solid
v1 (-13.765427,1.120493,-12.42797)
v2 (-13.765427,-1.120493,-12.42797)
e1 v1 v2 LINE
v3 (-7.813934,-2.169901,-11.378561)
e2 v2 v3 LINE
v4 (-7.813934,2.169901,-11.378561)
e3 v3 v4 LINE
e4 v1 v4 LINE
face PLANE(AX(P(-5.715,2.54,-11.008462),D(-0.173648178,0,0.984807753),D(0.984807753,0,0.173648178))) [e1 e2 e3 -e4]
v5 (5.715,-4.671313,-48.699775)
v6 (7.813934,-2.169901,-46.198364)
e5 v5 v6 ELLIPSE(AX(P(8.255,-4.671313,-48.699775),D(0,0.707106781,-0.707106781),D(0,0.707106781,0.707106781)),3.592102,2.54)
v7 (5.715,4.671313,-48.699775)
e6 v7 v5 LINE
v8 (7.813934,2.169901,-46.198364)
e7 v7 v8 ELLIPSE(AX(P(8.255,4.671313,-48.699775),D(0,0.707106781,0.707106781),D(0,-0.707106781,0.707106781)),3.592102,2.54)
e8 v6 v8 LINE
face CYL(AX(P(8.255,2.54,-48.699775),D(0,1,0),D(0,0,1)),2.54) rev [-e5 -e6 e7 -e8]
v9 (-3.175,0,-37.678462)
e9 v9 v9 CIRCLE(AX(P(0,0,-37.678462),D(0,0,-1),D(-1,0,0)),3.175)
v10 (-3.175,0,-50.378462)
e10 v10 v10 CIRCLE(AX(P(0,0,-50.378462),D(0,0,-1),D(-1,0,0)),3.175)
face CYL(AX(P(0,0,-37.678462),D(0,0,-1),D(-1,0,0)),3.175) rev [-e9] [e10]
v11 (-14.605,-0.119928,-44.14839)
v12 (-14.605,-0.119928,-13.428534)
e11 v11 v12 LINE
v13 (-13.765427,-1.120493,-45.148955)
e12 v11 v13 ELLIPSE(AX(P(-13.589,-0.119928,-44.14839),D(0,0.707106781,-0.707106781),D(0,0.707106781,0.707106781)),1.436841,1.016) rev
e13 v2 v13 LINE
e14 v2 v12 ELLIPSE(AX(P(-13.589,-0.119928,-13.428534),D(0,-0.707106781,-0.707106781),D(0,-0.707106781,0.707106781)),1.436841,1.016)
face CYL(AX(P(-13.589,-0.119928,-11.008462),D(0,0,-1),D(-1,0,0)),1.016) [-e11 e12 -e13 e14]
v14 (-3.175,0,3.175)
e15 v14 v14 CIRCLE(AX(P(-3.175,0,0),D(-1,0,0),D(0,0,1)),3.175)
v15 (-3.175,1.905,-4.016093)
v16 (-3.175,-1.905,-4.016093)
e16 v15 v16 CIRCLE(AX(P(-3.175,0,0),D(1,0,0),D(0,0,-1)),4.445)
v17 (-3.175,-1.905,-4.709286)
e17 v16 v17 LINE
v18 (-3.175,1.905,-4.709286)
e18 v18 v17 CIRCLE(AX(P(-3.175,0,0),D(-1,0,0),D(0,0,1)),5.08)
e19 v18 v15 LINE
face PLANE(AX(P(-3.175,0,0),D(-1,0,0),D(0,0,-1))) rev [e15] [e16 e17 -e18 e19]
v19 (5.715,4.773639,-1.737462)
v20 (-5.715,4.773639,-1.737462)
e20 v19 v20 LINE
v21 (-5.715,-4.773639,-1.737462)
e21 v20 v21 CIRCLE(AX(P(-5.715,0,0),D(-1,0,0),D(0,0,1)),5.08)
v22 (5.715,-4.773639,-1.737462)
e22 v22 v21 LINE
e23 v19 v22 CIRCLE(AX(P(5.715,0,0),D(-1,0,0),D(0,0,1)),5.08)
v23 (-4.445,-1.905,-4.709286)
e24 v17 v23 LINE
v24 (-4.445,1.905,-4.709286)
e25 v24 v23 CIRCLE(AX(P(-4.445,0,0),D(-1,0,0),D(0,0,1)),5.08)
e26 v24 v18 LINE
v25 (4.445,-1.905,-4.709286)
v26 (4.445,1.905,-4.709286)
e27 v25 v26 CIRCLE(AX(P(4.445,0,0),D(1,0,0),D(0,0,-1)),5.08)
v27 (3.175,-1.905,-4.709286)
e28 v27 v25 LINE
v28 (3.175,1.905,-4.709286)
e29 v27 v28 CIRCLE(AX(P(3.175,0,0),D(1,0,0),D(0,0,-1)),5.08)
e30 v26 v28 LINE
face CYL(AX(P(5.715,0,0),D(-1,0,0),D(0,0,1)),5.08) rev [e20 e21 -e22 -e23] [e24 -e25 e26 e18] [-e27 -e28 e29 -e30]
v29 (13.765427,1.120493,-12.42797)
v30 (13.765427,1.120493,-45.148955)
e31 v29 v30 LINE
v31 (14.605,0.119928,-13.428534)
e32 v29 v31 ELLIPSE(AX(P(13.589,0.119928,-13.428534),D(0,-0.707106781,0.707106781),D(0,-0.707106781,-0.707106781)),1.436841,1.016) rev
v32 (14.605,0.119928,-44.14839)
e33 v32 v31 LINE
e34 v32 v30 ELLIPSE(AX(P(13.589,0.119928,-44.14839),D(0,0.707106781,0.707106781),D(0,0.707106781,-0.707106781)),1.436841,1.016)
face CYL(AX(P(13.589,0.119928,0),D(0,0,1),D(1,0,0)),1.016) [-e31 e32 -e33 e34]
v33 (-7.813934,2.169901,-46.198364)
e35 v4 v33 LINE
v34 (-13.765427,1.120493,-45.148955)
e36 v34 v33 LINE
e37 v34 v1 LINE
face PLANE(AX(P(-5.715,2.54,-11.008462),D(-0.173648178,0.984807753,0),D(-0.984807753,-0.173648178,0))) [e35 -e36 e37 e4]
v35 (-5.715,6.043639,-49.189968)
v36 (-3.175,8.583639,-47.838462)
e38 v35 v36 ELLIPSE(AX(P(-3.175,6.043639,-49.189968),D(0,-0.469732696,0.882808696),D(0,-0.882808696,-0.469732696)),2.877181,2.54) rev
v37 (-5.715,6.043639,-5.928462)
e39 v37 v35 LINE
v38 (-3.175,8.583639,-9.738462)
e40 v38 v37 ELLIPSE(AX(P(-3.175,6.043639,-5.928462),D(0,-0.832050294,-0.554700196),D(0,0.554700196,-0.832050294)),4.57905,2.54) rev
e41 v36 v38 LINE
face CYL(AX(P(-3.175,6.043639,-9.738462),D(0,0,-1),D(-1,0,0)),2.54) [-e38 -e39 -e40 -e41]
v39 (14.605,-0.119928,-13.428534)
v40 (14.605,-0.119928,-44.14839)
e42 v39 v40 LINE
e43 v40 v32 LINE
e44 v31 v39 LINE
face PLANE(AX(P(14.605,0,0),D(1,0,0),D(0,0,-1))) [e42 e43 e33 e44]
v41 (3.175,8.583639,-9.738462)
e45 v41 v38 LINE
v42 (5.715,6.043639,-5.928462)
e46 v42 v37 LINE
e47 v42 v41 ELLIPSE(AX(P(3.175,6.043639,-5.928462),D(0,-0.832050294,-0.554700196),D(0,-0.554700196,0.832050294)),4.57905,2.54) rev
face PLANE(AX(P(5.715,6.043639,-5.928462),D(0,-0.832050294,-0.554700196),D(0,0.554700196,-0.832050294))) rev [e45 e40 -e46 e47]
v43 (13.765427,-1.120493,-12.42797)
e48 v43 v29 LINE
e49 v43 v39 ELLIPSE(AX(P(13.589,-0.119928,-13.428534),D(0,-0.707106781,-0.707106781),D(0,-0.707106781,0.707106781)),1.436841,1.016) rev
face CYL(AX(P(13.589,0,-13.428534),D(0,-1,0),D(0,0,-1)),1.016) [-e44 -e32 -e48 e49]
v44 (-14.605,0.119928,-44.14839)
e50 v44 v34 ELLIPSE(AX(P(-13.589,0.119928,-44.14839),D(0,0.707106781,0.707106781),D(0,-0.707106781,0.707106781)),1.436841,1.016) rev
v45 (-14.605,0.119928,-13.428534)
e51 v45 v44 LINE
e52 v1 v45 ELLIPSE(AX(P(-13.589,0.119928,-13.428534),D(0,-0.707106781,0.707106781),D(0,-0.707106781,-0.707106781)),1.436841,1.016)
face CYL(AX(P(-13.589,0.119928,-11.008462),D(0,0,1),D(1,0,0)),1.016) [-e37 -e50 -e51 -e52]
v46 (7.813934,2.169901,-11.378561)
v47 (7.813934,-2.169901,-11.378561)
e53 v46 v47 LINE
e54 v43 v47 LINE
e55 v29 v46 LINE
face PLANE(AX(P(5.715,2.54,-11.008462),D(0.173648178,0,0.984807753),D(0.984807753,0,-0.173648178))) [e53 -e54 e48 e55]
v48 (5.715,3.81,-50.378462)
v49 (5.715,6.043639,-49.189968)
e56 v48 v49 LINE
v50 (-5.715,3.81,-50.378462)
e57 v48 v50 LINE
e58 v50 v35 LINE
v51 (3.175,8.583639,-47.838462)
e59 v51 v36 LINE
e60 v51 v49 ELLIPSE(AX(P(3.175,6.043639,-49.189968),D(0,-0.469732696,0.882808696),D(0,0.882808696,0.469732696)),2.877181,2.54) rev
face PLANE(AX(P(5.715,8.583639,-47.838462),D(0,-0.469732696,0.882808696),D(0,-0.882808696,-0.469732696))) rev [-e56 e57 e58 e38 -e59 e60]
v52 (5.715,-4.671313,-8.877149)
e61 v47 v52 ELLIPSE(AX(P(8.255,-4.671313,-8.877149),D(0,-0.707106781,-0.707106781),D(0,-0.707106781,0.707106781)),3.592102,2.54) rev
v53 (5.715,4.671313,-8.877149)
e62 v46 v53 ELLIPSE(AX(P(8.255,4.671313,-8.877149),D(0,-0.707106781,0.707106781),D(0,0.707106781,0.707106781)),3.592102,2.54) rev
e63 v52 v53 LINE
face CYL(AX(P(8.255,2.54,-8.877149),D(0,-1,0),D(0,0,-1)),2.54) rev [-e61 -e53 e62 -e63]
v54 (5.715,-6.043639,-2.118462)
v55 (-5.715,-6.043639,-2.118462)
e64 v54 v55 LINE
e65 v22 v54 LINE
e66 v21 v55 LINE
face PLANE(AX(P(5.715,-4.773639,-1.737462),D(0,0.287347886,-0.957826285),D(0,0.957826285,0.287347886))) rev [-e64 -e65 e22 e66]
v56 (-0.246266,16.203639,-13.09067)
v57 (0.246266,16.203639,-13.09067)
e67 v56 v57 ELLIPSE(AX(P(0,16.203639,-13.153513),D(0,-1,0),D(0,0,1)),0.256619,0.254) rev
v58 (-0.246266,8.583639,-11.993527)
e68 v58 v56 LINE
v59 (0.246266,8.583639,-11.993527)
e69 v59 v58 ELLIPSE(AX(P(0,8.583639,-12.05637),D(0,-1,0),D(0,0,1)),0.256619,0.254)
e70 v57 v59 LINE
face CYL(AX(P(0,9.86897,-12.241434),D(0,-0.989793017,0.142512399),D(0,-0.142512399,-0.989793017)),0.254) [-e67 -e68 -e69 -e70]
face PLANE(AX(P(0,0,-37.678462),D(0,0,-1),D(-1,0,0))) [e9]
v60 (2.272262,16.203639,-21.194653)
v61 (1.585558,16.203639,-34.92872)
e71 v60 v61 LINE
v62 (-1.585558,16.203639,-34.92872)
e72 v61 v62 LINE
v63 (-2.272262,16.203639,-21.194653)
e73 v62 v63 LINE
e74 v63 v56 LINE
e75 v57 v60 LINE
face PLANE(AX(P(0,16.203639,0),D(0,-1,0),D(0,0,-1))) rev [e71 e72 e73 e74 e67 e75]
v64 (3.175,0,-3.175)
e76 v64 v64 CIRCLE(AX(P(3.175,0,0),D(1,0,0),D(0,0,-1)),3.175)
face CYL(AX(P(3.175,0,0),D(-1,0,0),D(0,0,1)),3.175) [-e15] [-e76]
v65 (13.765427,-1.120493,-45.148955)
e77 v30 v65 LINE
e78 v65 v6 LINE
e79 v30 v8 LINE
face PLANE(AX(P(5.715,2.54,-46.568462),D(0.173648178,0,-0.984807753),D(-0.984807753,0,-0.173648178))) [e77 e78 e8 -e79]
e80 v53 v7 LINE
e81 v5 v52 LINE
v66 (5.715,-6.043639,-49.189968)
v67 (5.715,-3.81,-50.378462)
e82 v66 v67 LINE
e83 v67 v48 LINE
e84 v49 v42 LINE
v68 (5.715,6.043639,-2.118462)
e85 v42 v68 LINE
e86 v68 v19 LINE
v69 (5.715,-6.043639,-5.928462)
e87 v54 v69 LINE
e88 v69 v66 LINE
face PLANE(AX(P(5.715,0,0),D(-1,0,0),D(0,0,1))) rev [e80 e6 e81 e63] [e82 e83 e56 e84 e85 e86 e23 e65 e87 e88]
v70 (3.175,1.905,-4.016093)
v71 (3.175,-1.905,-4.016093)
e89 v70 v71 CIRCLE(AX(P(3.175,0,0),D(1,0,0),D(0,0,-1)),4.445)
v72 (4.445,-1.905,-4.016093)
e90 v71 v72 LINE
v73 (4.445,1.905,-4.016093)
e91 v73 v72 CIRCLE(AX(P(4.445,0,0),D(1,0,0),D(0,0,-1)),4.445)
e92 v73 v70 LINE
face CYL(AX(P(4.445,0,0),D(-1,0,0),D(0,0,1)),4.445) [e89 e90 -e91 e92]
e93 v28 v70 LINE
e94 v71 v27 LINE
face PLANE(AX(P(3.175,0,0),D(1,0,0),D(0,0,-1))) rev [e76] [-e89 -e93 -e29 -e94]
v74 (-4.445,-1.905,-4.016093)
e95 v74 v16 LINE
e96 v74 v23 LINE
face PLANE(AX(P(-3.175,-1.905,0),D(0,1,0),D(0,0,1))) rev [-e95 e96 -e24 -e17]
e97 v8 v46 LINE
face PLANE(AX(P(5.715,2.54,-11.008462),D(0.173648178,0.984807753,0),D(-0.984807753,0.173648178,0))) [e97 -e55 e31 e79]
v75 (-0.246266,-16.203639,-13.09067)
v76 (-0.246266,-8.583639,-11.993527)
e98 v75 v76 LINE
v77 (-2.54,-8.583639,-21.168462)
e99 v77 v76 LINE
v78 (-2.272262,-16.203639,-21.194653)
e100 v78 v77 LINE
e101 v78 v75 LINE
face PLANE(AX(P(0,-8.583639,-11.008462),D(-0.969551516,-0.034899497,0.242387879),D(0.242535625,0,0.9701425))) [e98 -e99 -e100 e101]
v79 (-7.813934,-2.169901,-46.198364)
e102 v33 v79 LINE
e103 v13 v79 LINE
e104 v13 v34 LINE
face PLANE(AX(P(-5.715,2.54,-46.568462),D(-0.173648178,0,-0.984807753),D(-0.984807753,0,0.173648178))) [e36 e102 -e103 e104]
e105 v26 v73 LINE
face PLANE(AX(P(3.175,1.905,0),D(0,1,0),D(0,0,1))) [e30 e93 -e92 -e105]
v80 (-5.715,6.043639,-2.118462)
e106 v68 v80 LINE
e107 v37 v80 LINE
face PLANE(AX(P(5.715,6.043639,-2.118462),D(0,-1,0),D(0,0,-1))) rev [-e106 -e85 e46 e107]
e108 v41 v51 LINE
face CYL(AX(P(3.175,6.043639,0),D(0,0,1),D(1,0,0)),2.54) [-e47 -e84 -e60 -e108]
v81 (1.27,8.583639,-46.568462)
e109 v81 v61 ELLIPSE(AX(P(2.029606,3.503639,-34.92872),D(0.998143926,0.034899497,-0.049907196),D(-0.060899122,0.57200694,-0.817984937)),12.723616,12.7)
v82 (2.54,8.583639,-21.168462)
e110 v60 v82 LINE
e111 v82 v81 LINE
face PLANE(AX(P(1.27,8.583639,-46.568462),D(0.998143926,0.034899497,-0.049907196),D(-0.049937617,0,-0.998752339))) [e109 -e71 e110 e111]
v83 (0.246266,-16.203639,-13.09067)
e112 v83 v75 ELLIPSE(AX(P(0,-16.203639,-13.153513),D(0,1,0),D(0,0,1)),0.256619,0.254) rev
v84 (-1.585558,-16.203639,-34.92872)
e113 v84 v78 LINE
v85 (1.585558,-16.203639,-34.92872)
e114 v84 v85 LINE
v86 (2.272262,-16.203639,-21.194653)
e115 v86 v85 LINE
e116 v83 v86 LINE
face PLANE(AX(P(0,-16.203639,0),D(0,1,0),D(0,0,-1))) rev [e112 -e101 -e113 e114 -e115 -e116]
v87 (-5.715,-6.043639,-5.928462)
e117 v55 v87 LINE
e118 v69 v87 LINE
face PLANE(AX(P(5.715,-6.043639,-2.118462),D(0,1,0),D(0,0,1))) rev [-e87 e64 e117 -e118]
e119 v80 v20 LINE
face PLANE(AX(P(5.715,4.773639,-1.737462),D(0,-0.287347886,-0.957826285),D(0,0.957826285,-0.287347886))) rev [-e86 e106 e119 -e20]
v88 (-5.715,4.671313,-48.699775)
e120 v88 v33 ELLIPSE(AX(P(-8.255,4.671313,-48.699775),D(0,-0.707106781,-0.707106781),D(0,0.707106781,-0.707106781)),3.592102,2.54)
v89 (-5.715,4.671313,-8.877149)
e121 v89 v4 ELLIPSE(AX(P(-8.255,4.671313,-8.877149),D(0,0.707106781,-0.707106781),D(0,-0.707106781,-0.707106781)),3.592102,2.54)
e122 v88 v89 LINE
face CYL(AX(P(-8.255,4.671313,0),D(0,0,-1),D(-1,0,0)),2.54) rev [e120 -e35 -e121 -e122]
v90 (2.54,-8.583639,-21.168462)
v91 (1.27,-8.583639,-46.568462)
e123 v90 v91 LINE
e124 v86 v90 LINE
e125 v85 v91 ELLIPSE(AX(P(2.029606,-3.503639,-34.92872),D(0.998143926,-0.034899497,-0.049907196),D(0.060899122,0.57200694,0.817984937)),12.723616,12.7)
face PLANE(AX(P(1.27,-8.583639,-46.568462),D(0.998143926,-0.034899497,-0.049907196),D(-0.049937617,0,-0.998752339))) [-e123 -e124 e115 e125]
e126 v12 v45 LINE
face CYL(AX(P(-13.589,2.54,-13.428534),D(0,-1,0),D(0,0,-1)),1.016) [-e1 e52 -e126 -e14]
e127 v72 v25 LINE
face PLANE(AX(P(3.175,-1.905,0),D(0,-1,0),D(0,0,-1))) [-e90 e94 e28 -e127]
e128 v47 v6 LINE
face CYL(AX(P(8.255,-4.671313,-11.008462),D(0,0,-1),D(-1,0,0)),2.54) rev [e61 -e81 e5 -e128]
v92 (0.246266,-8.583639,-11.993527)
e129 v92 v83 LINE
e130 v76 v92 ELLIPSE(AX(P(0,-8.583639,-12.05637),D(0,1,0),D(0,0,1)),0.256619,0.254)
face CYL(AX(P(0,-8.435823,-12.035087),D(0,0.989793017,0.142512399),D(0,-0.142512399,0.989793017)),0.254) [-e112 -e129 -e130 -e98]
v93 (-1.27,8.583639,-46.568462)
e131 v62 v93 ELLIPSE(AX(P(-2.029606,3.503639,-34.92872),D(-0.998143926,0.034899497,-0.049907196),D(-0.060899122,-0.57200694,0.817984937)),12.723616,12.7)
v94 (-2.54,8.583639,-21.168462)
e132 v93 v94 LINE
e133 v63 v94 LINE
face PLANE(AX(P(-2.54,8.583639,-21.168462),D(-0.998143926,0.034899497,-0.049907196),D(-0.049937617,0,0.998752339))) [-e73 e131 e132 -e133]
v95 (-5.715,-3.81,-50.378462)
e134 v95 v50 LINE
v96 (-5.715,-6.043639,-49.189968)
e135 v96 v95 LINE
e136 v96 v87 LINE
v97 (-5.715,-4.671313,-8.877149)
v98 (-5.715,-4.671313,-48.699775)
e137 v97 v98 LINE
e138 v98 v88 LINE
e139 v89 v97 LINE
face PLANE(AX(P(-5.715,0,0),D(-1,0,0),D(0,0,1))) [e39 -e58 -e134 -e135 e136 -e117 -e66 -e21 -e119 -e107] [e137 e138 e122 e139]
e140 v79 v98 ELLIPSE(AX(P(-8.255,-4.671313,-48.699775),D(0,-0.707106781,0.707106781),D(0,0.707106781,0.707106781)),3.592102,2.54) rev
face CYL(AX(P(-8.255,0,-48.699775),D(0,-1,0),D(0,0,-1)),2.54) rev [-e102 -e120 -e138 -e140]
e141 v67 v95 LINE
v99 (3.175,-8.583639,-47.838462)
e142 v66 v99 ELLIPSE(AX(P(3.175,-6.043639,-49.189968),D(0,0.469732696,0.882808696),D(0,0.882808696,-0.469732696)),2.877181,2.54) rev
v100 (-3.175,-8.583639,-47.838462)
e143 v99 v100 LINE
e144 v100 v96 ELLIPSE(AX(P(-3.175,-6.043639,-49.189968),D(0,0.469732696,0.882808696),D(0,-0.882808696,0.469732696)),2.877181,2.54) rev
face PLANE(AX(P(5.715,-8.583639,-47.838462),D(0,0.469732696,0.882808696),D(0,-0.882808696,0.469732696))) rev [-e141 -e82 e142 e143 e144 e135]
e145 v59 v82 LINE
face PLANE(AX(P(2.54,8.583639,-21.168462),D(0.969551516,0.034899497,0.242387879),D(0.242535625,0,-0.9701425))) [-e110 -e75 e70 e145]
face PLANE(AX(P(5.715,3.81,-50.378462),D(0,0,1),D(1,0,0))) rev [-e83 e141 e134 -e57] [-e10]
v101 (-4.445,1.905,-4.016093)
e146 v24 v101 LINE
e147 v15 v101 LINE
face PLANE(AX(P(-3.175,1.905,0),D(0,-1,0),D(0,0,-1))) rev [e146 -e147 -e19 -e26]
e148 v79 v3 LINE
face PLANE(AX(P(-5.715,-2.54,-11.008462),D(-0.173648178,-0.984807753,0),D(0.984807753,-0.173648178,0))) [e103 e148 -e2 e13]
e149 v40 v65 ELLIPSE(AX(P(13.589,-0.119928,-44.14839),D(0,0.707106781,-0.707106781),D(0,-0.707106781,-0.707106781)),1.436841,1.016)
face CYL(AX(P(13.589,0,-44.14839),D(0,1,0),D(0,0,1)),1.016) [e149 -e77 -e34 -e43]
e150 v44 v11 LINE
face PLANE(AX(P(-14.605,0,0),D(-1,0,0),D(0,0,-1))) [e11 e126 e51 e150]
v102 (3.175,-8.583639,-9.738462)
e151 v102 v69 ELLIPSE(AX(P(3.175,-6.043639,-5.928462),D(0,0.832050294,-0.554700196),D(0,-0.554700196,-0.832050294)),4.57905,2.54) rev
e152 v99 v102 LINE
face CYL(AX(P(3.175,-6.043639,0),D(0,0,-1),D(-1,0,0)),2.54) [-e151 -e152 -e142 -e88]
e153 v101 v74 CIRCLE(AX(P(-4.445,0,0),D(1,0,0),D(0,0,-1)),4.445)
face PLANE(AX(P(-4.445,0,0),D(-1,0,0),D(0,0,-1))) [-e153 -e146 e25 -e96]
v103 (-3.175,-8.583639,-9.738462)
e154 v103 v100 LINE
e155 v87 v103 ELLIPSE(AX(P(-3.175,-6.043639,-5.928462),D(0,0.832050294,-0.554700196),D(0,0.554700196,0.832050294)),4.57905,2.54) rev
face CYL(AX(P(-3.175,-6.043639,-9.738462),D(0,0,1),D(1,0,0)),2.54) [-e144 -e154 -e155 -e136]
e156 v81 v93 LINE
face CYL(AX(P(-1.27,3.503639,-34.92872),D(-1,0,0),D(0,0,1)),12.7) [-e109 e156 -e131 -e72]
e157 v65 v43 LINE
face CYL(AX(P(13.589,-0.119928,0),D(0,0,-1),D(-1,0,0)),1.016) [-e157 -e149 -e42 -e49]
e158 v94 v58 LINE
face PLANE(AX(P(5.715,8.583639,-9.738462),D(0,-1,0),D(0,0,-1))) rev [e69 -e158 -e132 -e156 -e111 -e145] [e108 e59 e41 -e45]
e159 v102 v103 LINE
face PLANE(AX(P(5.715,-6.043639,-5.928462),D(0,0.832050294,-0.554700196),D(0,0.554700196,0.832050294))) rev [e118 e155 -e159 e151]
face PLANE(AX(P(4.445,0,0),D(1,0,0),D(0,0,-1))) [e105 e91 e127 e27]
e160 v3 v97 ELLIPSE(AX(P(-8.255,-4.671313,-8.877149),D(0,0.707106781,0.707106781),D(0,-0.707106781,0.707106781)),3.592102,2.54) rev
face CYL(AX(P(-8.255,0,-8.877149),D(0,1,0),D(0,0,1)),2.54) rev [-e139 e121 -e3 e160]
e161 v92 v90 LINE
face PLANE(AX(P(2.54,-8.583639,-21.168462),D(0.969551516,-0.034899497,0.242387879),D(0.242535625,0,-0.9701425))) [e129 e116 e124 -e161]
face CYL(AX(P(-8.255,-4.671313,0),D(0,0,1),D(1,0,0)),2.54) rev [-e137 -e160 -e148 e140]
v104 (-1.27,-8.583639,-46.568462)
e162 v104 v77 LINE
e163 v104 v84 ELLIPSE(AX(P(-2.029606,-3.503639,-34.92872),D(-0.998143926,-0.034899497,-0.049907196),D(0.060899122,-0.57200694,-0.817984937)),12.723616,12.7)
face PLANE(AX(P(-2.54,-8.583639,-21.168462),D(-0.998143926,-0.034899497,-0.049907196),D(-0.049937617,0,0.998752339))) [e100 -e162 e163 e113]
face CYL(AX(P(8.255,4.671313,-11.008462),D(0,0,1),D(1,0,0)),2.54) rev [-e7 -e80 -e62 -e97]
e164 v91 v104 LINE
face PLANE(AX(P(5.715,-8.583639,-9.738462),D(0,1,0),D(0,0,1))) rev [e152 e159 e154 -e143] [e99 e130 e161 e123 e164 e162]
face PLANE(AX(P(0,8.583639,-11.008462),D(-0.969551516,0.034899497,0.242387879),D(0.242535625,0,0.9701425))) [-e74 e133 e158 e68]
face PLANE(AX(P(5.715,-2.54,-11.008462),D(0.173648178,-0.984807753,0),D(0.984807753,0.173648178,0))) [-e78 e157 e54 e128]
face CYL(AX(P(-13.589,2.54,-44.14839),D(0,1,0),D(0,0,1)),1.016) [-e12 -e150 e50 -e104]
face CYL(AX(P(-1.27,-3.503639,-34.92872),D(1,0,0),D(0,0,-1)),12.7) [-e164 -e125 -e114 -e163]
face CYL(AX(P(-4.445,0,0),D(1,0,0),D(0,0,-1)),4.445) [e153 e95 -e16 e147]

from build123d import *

# Parameters (mm, degrees)
SKETCH1_R                = 3.175
BOSS_EXTRUDE1_DEPTH      = 3.175
SKETCH2_R                = 4.444999999999999
BOSS_EXTRUDE2_DEPTH      = 1.27
BOSS_EXTRUDE3_DEPTH      = 1.27
BOSS_EXTRUDE4_DEPTH      = 8.89
BOSS_EXTRUDE4_DEPTH_BACK = 2.54
SKETCH5_R                = 3.175
CUT_EXTRUDE1_DEPTH       = 12.7
FILLET1_R                = 2.54
SKETCH6_W                = 35.559999999999995
SKETCH6_H                = 5.08
BOSS_EXTRUDE5_DEPTH      = 8.889999999999999
BOSS_EXTRUDE5_TAPER      = 10.000000000000021
FILLET2_R                = 1.016
FILLET3_R                = 2.54
BOSS_EXTRUDE6_DEPTH      = 7.619999999999995
BOSS_EXTRUDE6_TAPER      = 2.000000000000002
FILLET4_R                = 0.254
FILLET5_R                = 12.7


with BuildPart() as part:
    # Sketch1 → Boss-Extrude1 (new, symmetric)
    with BuildSketch(Plane(origin=(0, 0, 0), x_dir=(0, 0, -1), z_dir=(1, 0, 0))):
        Circle(SKETCH1_R)
    extrude(amount=BOSS_EXTRUDE1_DEPTH, both=True)

    # Sketch2 → Boss-Extrude2 (add)
    with BuildSketch(Plane(origin=(3.175, 0, 0), x_dir=(0, 0, -1), z_dir=(1, 0, 0))):
        Circle(SKETCH2_R)
    boss_extrude2 = extrude(amount=BOSS_EXTRUDE2_DEPTH)

    # Mirror1: Boss-Extrude2 across plane
    add(boss_extrude2.mirror(Plane(origin=(0, 0, 0), x_dir=(0, 0, 1), z_dir=(1, 0, 0))))

    # Sketch3 → Boss-Extrude3 (add)
    with BuildSketch(Plane(origin=(4.445, 0, 0), x_dir=(0, 0, -1), z_dir=(1, 0, 0))):
        Polygon((-7.3e-16, 1.9049999999999998), (6.349999999999998, 1.9050000000000038), (6.349999999999999, -1.9049999999999998), (4.4e-16, -1.9049999999999998), align=None)
    boss_extrude3 = extrude(amount=-BOSS_EXTRUDE3_DEPTH)

    # Mirror2: Boss-Extrude3 across plane
    add(boss_extrude3.mirror(Plane(origin=(0, 0, 0), x_dir=(0, 0, 1), z_dir=(1, 0, 0))))

    # Sketch4 → Boss-Extrude4 (add, two sides: drawn at the far end of the back side and taken through both)
    with BuildSketch(Plane(origin=(-3.175, 0, 0), x_dir=(0, 0, -1), z_dir=(1, 0, 0)).offset(-BOSS_EXTRUDE4_DEPTH_BACK)):
        with BuildLine():
            Line((1.7374623280944008, 4.773638513592414), (2.1184623280943997, 6.0436385135924136))
            Line((2.1184623280943997, 6.0436385135924136), (5.928462328094399, 6.0436385135924136))
            Line((5.928462328094399, 6.0436385135924136), (9.738462328094398, 8.583638513592414))
            Line((9.738462328094398, 8.583638513592414), (47.838462328094394, 8.583638513592414))
            Line((47.838462328094394, 8.583638513592414), (50.3784623280944, 3.8099999999999996))
            Line((50.3784623280944, 3.8099999999999996), (50.3784623280944, -3.8099999999999996))
            Line((50.3784623280944, -3.8099999999999996), (47.838462328094394, -8.583638513592414))
            Line((47.838462328094394, -8.583638513592414), (9.738462328094398, -8.583638513592414))
            Line((9.738462328094398, -8.583638513592414), (5.928462328094399, -6.0436385135924136))
            Line((5.928462328094399, -6.0436385135924136), (2.1184623280943997, -6.0436385135924136))
            Line((2.1184623280943997, -6.0436385135924136), (1.7374623280944008, -4.773638513592414))
            ThreePointArc((1.7374623280944008, -4.773638513592414), (5.080000000000001, 0), (1.7374623280944008, 4.773638513592414))
        make_face()
    extrude(amount=BOSS_EXTRUDE4_DEPTH + BOSS_EXTRUDE4_DEPTH_BACK)

    # Sketch5 → Cut-Extrude1 (cut)
    with BuildSketch(Plane(origin=(0, 0, -50.3784623280944), x_dir=(-1, 0, 0), z_dir=(0, 0, -1))):
        Circle(SKETCH5_R)
    extrude(amount=-CUT_EXTRUDE1_DEPTH, mode=Mode.SUBTRACT)

    # Fillet1
    fillet1_edges = [part.edges().sort_by_distance(p)[0] for p in [
        (5.715000000000001, -8.583638513592414, -28.788462328094397),
        (-5.715, -8.583638513592414, -28.788462328094397),
        (-5.715, 8.583638513592414, -28.788462328094397),
        (5.715000000000001, 8.583638513592414, -28.788462328094397),
    ]]
    fillet(fillet1_edges, radius=FILLET1_R)

    # Sketch6 → Boss-Extrude5 (add)
    with BuildSketch(Plane(origin=(5.715000000000001, 0, 0), x_dir=(0, 0, -1), z_dir=(1, 0, 0))):
        with Locations((28.7884623280944, 0)):
            Rectangle(SKETCH6_W, SKETCH6_H)
    boss_extrude5 = extrude(amount=BOSS_EXTRUDE5_DEPTH, taper=BOSS_EXTRUDE5_TAPER)

    # Mirror3: Boss-Extrude5 across plane
    add(boss_extrude5.mirror(Plane(origin=(0, 0, 0), x_dir=(0, 0, 1), z_dir=(1, 0, 0))))

    # Fillet2
    fillet2_edges = [part.edges().sort_by_distance(p)[0] for p in [
        (14.605, -1.6e-16, -12.57600918659266),
        (14.605, -0.9724531415017433, -28.788462328094404),
        (14.605, -1.6e-16, -45.00091546959614),
        (14.605, 0.9724531415017431, -28.788462328094397),
        (-14.605, -1.6e-16, -12.57600918659266),
        (-14.605, 0.9724531415017431, -28.788462328094397),
        (-14.605, -1.6e-16, -45.00091546959614),
        (-14.605, -0.9724531415017433, -28.788462328094404),
    ]]
    fillet(fillet2_edges, radius=FILLET2_R)

    # Fillet3
    fillet3_edges = [part.edges().sort_by_distance(p)[0] for p in [
        (5.715000000000001, 0, -11.008462328094403),
        (5.715000000000001, -2.54, -28.7884623280944),
        (5.715000000000001, 0, -46.5684623280944),
        (5.715000000000001, 2.54, -28.7884623280944),
        (-5.715000000000001, 0, -11.008462328094403),
        (-5.715000000000001, -2.54, -28.7884623280944),
        (-5.715000000000001, 0, -46.5684623280944),
        (-5.715000000000001, 2.54, -28.7884623280944),
    ]]
    fillet(fillet3_edges, radius=FILLET3_R)

    # Sketch7 → Boss-Extrude6 (add)
    with BuildSketch(Plane(origin=(0, 8.583638513592414, 0), x_dir=(1, 0, 0), z_dir=(0, 1, 0))):
        Polygon((-1.27, 46.568462328094405), (-2.5399999999999983, 21.168462328094403), (0, 11.0084623280944), (2.5399999999999983, 21.168462328094403), (1.27, 46.568462328094405), align=None)
    boss_extrude6 = extrude(amount=BOSS_EXTRUDE6_DEPTH, taper=BOSS_EXTRUDE6_TAPER)

    # Mirror4: Boss-Extrude6 across plane
    add(boss_extrude6.mirror(Plane.ZX))

    # Fillet4
    fillet4_edges = [part.edges().sort_by_distance(p)[0] for p in [
        (0, 12.39363851359241, -11.557033828646649),
        (0, -12.39363851359241, -11.557033828646649),
    ]]
    fillet(fillet4_edges, radius=FILLET4_R)

    # Fillet5
    # the kernel refuses this fillet: 12.7 mm, written as the material it takes off along each edge
    with BuildSketch(Plane(origin=(29.450991141099852, -16.20363851359241, -46.30236606456729), x_dir=(0, 0.9993908270190958, -0.03489949670250097), z_dir=(-1, 0, 0))) as fillet5_piece_1:
        with BuildLine():
            CenterArc((12.295328982012144, -11.809941091943898), FILLET5_R, 111.57817847820185, 66.42182152179815)
            Line((-0.39693452113037153, -11.366717483822136), (-0.6507797911932232, -11.357853011659701))
            Line((-0.6507797911932232, -11.357853011659701), (-0.2538452700628517, 0.00886447216243529))
            Line((-0.2538452700628517, 0.00886447216243529), (-1.12e-15, 0.25399999999999656))
            ThreePointArc((-1.12e-15, 0.25399999999999656), (3.8123223637785104, 0.2539999999999965), (7.531231042467917, 0.23619882183887903))
            Line((7.531231042467917, 0.23619882183887903), (7.624644727557019, -4e-17))
        make_face()
    extrude(amount=58.90198228219971, mode=Mode.SUBTRACT)
    with BuildSketch(Plane(origin=(29.450991141099852, 16.20363851359241, -46.30236606456729), x_dir=(0, -0.9993908270190958, -0.03489949670250097), z_dir=(-1, 0, 0))) as fillet5_piece_2:
        with BuildLine():
            CenterArc((12.295328982012144, 11.809941091943898), FILLET5_R, 182, 66.42182152179817)
            Line((-0.39693452113037153, 11.366717483822136), (-0.6507797911932232, 11.357853011659701))
            Line((-0.6507797911932232, 11.357853011659701), (-0.2538452700628517, -0.00886447216243529))
            Line((-0.2538452700628517, -0.00886447216243529), (-1.12e-15, -0.25399999999999656))
            ThreePointArc((-1.12e-15, -0.25399999999999656), (3.8123223637785104, -0.2539999999999965), (7.531231042467917, -0.23619882183887903))
            Line((7.531231042467917, -0.23619882183887903), (7.624644727557019, 4e-17))
        make_face()
    extrude(amount=58.90198228219971, mode=Mode.SUBTRACT)


solid = part.part
